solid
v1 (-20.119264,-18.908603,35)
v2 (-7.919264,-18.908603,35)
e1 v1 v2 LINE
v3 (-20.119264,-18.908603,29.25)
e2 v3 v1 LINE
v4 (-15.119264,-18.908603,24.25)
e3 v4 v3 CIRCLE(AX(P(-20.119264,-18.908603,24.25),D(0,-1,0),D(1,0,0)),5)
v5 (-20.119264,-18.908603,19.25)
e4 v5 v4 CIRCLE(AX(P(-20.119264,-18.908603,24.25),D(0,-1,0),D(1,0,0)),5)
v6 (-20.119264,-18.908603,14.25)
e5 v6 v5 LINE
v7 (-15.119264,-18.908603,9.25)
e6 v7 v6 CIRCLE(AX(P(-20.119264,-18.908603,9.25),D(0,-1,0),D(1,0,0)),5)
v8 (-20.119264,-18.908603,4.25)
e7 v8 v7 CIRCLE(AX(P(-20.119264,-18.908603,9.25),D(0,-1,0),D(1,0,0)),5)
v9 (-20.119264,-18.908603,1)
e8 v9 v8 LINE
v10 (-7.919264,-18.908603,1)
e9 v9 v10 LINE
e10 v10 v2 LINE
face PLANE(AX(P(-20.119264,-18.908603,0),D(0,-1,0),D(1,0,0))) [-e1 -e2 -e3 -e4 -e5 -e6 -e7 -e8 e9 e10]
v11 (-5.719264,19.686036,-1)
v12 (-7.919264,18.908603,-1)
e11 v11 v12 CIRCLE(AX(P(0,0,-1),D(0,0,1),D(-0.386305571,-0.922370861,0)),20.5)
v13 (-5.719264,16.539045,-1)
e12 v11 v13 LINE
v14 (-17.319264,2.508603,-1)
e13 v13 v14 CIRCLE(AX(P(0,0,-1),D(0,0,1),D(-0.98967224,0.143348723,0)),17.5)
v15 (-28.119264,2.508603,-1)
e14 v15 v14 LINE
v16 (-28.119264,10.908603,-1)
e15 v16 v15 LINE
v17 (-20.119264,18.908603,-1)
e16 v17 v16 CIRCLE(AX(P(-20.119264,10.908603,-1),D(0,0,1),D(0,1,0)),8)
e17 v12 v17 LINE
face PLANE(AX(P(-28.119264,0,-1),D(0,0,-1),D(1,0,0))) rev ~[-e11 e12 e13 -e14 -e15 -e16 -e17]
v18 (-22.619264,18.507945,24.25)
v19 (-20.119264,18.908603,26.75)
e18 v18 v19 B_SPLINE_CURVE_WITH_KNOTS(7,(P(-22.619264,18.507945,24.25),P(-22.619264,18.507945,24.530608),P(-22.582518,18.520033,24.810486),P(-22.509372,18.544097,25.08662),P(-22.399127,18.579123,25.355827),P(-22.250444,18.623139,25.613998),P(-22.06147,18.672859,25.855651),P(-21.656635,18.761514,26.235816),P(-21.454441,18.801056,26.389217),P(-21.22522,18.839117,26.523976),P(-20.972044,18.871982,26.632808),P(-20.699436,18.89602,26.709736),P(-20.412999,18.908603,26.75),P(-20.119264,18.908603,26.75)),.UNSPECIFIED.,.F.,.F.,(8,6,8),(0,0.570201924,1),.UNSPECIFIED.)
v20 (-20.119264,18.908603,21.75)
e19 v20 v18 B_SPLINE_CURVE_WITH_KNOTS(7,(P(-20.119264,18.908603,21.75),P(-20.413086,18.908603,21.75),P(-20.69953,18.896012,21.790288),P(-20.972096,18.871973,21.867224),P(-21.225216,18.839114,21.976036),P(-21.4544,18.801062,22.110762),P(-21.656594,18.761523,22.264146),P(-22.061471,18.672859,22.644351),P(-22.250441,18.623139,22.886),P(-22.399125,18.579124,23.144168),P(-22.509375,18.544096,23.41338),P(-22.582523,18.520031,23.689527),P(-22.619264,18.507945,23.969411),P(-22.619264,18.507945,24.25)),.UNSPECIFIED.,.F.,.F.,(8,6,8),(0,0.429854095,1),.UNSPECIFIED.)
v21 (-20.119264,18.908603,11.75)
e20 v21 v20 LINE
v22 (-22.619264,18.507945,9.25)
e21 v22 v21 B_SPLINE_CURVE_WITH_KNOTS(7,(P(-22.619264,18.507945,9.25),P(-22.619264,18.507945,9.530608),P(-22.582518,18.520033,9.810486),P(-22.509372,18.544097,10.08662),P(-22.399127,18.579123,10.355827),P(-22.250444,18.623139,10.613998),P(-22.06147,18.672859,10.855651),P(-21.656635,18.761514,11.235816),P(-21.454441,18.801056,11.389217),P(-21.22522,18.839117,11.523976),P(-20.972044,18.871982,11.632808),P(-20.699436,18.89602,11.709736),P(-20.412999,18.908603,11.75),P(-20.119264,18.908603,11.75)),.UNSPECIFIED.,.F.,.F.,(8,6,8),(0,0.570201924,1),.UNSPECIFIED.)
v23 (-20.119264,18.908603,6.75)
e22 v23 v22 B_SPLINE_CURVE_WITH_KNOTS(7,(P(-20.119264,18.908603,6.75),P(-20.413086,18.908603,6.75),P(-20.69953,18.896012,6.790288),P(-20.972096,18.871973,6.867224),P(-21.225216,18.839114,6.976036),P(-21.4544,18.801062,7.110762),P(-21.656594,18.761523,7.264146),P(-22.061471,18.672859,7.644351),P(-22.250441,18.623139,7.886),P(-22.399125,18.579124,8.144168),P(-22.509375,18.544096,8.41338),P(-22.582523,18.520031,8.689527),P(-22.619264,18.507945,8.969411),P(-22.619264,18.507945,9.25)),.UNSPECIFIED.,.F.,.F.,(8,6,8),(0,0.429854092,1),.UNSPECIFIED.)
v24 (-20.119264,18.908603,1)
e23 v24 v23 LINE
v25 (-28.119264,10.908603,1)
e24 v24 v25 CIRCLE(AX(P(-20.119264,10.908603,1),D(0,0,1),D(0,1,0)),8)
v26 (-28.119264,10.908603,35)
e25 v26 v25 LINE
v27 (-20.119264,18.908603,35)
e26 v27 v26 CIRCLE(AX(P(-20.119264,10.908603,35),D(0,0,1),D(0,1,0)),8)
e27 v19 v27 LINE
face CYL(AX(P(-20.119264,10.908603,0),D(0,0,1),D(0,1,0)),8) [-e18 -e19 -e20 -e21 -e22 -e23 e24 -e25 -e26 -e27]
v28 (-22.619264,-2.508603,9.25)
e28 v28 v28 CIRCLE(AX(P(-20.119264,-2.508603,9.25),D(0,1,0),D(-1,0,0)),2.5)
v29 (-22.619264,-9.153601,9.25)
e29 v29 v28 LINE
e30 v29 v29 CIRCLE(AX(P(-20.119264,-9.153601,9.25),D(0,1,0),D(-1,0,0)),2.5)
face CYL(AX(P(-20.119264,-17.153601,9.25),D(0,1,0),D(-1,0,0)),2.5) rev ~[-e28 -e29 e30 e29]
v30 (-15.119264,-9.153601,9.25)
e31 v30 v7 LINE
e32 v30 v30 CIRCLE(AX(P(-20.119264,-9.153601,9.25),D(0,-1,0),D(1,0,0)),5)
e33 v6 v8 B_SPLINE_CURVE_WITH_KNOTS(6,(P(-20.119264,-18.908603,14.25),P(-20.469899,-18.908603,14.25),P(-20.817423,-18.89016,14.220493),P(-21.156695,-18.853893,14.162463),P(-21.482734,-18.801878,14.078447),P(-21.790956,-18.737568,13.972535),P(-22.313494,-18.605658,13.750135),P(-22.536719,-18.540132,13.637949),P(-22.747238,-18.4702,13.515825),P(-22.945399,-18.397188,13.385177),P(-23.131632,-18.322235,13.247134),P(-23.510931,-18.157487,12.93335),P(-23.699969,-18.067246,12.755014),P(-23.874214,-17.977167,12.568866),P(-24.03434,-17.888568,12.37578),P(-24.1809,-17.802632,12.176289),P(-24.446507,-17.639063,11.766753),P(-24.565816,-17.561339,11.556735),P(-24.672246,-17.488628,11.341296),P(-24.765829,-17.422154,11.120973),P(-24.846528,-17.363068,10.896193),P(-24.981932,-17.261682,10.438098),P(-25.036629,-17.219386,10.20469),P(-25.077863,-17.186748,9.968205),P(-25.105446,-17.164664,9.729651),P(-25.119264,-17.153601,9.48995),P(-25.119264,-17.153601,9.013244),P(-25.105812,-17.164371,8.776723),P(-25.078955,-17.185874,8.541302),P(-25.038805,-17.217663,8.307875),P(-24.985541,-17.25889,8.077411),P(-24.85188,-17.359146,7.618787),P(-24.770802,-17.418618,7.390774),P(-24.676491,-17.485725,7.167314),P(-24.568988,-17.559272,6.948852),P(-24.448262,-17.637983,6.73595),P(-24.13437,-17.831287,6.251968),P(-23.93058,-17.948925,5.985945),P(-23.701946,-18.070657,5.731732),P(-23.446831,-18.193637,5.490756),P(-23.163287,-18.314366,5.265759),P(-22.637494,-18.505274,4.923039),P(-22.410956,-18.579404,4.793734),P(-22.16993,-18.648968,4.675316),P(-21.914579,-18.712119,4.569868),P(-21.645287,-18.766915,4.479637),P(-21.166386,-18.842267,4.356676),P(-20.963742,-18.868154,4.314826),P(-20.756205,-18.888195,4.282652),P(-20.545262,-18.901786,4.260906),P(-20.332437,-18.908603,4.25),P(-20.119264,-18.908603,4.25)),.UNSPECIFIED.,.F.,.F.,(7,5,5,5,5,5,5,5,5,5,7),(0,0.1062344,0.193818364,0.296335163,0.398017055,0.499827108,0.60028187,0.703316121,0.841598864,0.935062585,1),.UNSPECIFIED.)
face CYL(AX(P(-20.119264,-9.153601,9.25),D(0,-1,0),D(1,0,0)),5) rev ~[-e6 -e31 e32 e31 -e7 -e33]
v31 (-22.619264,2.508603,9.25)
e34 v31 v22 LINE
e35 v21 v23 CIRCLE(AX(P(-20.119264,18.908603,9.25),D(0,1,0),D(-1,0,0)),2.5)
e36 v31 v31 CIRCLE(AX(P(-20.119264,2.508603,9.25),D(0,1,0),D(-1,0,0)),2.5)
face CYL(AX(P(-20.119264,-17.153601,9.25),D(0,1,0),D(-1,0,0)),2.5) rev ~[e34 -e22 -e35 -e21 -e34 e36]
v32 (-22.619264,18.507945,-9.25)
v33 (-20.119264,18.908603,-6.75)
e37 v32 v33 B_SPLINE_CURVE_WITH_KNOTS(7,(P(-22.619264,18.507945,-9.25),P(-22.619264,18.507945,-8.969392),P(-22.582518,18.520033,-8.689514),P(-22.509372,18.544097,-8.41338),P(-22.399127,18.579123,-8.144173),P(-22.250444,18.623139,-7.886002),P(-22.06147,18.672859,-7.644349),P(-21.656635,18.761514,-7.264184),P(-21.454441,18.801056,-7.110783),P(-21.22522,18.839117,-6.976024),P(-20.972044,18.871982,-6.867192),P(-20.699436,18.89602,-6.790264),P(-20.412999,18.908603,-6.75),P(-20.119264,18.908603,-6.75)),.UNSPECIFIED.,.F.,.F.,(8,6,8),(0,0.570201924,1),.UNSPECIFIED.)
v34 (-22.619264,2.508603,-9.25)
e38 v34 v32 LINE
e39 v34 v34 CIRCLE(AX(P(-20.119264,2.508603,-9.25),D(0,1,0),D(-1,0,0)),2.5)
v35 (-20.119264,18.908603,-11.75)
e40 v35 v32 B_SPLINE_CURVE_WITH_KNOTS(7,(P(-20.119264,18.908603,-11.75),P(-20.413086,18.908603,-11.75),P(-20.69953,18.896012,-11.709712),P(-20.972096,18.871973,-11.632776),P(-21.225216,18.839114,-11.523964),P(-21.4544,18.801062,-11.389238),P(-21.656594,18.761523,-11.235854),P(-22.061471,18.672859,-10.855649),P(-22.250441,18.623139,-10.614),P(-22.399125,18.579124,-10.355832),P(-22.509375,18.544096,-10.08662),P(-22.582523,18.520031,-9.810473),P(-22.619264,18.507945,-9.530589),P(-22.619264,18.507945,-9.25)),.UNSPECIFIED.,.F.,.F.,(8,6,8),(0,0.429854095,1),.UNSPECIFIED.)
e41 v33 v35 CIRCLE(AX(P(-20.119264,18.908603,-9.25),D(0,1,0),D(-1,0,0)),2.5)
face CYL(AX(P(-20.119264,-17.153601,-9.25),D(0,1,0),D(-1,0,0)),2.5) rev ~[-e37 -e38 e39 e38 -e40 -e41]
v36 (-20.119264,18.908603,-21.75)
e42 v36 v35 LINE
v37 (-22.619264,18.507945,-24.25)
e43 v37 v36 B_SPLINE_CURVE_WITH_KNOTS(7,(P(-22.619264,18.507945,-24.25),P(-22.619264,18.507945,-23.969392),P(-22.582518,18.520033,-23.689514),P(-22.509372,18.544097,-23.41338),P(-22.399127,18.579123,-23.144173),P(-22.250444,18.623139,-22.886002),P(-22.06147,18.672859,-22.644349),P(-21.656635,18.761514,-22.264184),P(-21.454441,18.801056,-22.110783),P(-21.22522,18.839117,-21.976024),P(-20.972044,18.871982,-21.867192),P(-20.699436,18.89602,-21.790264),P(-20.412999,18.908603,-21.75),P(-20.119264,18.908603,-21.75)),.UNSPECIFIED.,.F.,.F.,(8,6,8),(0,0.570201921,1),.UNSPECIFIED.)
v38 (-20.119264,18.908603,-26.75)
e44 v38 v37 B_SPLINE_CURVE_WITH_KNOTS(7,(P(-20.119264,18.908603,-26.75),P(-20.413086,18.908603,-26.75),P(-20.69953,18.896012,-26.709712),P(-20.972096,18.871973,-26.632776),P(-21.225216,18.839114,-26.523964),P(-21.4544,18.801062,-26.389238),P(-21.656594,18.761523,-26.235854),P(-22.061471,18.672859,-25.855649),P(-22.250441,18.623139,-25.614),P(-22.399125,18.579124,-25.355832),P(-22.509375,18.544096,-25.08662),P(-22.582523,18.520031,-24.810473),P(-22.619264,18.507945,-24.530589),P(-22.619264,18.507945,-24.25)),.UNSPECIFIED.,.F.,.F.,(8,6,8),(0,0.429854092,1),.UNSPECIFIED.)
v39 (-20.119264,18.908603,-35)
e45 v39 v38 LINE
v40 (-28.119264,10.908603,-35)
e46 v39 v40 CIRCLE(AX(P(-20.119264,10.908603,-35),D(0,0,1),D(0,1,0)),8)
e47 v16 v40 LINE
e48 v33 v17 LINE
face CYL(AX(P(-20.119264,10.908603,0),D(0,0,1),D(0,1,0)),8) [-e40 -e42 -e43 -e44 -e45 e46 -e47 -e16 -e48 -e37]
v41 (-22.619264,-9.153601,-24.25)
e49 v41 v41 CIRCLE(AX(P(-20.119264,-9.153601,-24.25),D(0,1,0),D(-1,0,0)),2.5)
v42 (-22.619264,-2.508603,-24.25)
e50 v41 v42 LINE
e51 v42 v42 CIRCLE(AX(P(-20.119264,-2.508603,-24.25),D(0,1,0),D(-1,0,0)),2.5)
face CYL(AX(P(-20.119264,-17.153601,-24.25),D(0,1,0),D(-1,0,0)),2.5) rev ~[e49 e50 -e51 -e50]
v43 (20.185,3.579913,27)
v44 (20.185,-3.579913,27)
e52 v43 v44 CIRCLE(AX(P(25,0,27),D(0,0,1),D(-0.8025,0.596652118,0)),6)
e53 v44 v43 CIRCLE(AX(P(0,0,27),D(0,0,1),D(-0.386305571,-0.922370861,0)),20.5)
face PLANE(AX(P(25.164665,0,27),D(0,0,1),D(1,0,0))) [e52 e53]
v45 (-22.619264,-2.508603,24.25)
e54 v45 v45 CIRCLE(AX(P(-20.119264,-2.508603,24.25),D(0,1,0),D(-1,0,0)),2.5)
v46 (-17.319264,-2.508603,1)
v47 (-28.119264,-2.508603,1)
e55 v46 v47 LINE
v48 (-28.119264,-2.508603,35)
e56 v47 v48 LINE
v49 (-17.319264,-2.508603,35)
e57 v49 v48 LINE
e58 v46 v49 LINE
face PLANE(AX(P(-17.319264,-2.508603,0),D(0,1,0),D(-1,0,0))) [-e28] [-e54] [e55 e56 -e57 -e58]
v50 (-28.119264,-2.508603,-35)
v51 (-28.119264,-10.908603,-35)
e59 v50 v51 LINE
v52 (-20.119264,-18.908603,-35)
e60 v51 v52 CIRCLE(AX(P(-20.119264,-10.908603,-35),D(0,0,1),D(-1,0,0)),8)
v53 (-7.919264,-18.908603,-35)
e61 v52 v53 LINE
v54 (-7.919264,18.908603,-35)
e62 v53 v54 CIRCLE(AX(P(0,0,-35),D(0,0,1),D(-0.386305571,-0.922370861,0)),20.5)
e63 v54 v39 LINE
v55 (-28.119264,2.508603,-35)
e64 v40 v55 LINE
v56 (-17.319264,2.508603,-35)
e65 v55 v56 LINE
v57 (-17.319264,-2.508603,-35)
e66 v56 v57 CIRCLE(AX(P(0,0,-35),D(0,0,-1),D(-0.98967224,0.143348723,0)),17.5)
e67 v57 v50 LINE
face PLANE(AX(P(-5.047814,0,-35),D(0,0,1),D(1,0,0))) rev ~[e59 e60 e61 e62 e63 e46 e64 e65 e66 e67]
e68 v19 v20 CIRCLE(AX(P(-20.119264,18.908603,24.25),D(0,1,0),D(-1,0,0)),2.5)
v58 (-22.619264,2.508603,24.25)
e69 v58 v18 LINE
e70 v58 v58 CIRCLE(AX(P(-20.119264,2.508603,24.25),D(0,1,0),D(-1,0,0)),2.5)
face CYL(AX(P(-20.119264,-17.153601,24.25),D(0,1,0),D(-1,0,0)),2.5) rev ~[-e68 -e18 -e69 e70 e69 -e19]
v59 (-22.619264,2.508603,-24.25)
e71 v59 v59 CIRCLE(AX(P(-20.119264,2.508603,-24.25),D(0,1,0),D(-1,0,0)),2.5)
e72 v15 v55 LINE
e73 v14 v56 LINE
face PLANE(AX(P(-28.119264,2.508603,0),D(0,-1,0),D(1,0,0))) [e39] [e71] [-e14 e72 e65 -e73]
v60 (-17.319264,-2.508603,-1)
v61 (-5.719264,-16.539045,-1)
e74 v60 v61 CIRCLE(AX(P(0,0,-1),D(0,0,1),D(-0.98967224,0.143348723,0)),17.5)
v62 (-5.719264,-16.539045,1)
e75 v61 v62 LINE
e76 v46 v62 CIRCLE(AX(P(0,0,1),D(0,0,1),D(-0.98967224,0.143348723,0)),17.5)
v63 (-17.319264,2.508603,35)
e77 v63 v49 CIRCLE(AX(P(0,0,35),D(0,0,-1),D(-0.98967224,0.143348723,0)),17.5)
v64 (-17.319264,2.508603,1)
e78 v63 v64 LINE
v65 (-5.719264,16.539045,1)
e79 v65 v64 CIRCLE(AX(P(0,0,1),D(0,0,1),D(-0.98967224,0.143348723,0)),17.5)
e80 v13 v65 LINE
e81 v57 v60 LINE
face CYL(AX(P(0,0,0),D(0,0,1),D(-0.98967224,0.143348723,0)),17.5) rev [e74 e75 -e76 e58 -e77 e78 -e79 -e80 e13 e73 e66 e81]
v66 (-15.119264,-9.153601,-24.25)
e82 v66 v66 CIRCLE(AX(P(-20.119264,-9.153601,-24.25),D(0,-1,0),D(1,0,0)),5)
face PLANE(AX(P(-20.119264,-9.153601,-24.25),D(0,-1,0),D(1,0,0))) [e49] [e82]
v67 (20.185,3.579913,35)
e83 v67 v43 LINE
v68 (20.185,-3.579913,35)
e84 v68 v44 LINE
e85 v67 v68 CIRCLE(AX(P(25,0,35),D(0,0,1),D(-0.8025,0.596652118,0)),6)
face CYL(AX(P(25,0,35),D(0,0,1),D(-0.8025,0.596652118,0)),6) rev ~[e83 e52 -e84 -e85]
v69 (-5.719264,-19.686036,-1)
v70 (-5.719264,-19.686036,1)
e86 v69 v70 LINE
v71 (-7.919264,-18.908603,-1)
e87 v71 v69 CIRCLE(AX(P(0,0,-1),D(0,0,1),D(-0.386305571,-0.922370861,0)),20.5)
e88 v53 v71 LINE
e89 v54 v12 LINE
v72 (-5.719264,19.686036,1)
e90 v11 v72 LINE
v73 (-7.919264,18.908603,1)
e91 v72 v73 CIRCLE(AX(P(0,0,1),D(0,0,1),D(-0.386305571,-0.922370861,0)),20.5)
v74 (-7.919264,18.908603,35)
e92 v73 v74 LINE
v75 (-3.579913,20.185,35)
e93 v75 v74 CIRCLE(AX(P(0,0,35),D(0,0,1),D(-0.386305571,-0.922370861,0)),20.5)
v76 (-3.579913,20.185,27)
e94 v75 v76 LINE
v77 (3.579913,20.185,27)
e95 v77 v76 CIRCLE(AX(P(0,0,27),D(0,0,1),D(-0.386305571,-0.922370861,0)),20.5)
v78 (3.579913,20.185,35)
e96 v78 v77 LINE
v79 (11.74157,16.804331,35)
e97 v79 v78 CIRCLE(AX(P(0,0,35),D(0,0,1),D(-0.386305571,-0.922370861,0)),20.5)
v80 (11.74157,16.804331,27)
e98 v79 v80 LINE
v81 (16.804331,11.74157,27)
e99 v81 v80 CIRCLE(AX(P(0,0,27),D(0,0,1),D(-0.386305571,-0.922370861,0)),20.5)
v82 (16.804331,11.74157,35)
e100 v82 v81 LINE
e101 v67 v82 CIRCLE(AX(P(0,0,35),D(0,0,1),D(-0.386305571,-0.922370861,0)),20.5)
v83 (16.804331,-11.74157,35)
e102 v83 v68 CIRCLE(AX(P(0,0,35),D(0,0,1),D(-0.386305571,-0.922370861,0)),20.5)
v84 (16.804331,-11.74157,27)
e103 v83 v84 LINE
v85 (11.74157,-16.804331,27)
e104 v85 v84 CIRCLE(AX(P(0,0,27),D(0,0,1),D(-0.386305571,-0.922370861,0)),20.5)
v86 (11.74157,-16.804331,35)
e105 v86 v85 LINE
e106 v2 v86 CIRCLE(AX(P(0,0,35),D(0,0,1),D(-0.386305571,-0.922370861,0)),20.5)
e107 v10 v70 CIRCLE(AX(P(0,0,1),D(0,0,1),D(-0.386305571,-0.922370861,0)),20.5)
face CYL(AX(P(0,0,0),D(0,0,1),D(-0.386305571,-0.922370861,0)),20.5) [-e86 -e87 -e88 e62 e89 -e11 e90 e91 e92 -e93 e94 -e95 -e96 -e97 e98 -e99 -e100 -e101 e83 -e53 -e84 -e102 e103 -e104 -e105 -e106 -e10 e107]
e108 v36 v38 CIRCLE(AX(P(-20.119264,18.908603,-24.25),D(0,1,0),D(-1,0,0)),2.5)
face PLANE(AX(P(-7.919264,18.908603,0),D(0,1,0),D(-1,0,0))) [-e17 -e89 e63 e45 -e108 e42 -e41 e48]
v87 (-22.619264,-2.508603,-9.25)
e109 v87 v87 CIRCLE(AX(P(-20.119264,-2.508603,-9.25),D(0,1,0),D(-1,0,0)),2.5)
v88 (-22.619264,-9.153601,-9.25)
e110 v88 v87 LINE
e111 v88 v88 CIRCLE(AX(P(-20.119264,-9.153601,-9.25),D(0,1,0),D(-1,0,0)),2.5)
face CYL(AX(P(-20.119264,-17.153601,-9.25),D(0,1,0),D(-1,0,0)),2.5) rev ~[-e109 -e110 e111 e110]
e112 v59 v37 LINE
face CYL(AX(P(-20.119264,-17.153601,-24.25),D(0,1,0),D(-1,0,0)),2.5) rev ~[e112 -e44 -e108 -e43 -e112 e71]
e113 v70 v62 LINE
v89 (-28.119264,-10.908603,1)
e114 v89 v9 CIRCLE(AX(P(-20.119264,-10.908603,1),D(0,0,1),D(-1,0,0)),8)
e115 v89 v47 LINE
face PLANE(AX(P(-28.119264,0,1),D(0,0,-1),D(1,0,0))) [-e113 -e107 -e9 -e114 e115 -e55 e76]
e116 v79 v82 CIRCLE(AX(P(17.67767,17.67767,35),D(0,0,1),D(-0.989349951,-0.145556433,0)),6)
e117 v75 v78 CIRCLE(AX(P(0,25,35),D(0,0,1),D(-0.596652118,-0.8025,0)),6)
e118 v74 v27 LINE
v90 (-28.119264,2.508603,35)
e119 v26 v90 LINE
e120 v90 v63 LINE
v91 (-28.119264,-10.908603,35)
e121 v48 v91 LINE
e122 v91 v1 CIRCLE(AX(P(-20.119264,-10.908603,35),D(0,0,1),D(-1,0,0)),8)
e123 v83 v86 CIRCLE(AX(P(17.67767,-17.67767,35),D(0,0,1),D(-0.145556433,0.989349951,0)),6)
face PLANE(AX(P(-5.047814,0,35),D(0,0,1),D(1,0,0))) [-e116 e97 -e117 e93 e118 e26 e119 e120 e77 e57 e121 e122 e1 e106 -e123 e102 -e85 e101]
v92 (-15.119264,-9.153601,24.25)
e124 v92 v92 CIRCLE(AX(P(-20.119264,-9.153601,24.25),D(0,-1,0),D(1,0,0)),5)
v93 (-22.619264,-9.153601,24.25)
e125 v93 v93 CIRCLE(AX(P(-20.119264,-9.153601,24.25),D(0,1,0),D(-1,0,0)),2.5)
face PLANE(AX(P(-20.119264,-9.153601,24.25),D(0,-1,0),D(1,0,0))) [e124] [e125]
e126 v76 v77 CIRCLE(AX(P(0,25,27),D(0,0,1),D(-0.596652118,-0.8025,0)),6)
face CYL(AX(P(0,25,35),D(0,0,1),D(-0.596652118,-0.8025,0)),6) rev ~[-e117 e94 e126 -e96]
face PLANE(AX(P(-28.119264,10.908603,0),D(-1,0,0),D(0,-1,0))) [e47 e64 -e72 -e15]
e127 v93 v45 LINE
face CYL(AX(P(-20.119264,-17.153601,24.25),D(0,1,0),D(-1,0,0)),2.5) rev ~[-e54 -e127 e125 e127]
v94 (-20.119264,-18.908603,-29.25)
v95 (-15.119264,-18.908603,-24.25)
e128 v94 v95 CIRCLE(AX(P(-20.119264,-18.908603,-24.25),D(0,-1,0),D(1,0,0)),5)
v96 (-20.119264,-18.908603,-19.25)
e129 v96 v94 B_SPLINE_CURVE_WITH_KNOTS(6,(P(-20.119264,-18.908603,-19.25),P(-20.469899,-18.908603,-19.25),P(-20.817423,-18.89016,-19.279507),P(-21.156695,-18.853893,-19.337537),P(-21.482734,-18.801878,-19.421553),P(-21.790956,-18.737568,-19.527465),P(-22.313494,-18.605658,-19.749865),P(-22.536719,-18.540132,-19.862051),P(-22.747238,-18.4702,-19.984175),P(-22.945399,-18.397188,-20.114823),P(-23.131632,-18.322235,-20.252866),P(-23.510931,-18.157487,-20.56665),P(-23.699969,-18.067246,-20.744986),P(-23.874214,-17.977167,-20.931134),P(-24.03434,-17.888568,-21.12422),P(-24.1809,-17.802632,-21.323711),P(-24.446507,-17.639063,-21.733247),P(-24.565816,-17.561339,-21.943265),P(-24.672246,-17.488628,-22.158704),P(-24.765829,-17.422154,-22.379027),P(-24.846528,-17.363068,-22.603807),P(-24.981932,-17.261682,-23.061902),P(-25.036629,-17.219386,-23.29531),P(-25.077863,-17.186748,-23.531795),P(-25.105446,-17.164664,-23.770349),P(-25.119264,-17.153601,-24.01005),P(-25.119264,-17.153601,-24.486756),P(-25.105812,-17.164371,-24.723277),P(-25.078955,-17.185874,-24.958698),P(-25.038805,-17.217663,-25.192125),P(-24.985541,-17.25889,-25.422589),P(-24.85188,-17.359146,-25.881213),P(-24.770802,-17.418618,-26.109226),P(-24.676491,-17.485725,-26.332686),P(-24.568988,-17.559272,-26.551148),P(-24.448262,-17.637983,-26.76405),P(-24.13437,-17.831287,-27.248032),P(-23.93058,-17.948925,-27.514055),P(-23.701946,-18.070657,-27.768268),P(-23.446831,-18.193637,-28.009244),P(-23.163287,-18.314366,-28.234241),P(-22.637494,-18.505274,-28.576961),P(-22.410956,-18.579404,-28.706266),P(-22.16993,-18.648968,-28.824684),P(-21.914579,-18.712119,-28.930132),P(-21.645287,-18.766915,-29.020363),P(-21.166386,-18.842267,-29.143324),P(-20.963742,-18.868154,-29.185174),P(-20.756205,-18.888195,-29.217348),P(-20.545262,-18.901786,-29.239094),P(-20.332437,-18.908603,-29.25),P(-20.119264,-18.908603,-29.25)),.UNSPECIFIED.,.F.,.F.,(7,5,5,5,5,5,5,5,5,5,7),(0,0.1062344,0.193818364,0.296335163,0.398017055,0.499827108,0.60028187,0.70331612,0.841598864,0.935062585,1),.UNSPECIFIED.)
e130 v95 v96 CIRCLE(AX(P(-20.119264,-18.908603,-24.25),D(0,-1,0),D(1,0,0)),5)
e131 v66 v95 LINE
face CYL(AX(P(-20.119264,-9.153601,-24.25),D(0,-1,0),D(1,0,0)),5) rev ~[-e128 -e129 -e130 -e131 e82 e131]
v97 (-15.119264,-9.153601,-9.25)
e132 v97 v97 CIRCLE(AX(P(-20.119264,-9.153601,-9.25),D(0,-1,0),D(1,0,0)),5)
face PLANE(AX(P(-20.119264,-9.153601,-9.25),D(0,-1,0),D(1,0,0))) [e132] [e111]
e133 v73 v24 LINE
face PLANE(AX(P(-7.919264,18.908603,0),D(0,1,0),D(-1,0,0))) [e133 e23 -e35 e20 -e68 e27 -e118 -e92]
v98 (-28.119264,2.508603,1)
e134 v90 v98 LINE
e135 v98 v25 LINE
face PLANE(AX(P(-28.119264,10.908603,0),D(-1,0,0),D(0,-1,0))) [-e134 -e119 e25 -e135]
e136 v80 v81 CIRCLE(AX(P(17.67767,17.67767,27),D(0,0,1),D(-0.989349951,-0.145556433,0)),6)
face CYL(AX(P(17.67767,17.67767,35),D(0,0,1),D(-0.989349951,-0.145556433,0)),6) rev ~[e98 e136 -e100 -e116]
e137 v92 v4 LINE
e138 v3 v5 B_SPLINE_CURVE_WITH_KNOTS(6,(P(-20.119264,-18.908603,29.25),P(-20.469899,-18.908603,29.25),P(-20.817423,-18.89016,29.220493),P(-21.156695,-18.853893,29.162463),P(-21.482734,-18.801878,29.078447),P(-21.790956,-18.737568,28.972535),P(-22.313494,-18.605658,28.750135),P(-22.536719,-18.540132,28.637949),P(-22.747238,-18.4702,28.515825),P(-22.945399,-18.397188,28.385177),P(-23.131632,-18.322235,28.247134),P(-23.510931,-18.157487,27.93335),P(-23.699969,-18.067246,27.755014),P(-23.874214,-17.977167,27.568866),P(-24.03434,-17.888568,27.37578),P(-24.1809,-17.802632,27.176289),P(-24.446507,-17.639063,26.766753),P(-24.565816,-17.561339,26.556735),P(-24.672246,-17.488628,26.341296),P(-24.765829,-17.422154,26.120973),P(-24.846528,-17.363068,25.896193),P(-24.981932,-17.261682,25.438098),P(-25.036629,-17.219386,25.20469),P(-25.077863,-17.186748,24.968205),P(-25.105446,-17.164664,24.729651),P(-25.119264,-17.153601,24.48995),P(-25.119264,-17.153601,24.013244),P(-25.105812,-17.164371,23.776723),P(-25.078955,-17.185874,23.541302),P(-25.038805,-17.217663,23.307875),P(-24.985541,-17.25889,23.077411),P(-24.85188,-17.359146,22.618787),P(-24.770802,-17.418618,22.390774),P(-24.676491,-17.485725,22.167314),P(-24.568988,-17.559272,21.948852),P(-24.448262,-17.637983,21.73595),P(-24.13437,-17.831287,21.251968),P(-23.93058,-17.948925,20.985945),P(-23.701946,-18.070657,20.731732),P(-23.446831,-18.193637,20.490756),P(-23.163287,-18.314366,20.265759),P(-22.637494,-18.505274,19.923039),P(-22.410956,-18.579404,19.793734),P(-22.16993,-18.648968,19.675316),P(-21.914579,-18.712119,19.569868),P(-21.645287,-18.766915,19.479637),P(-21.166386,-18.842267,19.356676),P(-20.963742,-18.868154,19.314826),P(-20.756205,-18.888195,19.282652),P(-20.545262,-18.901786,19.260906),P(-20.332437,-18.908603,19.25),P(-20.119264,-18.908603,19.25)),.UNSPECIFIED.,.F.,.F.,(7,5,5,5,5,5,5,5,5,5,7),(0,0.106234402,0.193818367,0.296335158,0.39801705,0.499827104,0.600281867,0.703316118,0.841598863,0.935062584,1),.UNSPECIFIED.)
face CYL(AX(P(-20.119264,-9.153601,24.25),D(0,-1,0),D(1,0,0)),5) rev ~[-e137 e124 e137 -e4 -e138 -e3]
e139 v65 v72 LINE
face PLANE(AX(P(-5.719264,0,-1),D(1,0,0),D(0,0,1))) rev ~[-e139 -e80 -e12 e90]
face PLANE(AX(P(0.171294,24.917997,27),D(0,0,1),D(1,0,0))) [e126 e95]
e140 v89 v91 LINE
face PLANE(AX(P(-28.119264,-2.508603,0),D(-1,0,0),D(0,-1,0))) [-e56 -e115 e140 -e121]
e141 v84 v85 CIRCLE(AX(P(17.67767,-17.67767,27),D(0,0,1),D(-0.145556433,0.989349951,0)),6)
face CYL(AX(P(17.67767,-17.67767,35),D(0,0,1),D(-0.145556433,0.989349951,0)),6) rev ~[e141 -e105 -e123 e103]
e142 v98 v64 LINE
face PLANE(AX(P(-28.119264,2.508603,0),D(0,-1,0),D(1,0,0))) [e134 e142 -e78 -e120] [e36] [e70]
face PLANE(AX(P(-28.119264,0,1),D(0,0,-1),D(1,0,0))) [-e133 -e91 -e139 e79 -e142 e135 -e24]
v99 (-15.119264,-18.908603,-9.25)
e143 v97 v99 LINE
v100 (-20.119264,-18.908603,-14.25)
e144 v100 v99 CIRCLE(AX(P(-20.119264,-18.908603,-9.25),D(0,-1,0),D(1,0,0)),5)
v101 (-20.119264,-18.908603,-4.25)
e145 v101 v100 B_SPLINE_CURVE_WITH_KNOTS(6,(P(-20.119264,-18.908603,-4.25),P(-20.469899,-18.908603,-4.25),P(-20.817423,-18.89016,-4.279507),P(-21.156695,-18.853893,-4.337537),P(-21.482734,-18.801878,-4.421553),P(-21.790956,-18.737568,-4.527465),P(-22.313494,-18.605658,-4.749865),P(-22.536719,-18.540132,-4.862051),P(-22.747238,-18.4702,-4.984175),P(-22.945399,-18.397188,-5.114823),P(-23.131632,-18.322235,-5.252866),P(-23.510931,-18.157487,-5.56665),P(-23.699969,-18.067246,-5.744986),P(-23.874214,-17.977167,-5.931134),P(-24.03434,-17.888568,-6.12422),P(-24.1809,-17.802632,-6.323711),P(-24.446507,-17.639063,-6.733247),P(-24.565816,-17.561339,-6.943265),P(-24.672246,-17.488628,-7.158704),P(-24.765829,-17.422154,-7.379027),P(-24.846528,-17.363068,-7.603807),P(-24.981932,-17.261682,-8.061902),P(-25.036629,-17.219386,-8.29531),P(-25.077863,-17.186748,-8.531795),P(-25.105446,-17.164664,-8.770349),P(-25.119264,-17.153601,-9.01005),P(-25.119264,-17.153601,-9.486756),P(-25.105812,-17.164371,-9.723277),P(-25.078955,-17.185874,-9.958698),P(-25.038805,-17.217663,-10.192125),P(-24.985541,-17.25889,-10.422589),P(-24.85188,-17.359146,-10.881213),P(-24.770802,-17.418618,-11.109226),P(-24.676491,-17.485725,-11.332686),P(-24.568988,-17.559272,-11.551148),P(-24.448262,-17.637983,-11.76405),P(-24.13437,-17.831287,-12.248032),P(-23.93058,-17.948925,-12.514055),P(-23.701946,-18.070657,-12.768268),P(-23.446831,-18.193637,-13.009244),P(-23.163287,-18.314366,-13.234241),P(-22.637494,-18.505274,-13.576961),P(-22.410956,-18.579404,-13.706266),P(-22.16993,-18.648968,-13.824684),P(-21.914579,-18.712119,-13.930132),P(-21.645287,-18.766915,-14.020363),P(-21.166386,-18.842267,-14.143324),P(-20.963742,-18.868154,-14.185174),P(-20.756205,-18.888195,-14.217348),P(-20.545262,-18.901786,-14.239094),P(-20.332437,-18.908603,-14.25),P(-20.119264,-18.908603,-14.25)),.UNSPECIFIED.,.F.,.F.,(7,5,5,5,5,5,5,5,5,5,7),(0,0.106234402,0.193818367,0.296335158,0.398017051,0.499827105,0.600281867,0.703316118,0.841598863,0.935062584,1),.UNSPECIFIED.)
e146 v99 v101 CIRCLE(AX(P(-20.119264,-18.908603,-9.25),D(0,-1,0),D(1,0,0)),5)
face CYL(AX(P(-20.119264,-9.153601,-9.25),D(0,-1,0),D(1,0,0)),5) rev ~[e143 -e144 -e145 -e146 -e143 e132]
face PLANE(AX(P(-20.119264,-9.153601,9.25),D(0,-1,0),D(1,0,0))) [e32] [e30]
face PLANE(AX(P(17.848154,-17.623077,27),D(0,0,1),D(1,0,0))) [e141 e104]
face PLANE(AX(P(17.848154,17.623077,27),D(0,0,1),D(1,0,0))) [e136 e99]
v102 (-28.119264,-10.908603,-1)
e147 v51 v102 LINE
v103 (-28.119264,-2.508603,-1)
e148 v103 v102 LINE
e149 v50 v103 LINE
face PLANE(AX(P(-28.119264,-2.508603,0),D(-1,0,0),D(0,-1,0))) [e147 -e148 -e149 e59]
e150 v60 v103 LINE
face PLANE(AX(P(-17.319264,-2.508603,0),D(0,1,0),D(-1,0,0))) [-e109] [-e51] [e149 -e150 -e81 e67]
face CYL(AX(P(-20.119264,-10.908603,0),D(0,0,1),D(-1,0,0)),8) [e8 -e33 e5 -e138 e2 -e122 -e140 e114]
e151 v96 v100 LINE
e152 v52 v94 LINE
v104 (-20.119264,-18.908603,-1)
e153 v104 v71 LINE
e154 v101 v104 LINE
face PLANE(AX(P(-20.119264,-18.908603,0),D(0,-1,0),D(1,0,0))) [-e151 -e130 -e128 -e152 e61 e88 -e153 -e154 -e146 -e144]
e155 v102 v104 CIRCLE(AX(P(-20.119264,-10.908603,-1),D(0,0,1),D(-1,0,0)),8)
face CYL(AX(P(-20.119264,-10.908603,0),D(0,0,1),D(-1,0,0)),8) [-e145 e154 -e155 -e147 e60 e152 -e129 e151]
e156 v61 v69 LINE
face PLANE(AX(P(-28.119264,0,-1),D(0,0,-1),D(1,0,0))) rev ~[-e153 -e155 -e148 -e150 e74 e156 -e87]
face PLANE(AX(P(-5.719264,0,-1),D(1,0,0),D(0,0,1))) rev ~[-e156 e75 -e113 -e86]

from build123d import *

# Parameters (mm, degrees)
F1_DEPTH       = 35
F3_D           = 5
F3_START       = 1.7550021
F3_CBORE_D     = 10
F3_CBORE_DEPTH = 8
F4_W           = 22.4
F4_H           = 2
F5_DEPTH       = 25
F7_DEPTH       = 8


with BuildPart() as f1:
    # F0 (on Top) → F1 (new body, symmetric)
    with BuildSketch(Plane.XY):
        with BuildLine():
            ThreePointArc((-17.3192642082, 2.5086026559), (17.5, 0), (-17.3192642082, -2.5086026559))
            Line((-17.3192642082, -2.5086026559), (-28.1192642082, -2.5086026559))
            Line((-28.1192642082, -2.5086026559), (-28.1192642082, -10.9086026559))
            ThreePointArc((-28.1192642082, -10.9086026559), (-25.7761184577, -16.5654569054), (-20.1192642082, -18.9086026559))
            Line((-20.1192642082, -18.9086026559), (-7.9192642082, -18.9086026559))
            ThreePointArc((-7.9192642082, -18.9086026559), (20.5, 0), (-7.9192642082, 18.9086026559))
            Line((-7.9192642082, 18.9086026559), (-20.1192642082, 18.9086026559))
            ThreePointArc((-20.1192642082, 18.9086026559), (-25.7761184577, 16.5654569054), (-28.1192642082, 10.9086026559))
            Line((-28.1192642082, 10.9086026559), (-28.1192642082, 2.5086026559))
            Line((-28.1192642082, 2.5086026559), (-17.3192642082, 2.5086026559))
        make_face()
    extrude(amount=F1_DEPTH, both=True)

    # F3 (through all)
    # its depths count from where the whole tool has entered the part; down to there all is cleared
    with Locations(Plane.XZ.offset(18.9086026559).offset(-F3_START)):
        with Locations((-20.1192642082, 24.25), (-20.1192642082, 9.25), (-20.1192642082, -9.25), (-20.1192642082, -24.25)):
            CounterBoreHole(F3_D / 2, F3_CBORE_D / 2, F3_CBORE_DEPTH)

    # F4 (on Front) → F5 (cut, symmetric)
    with BuildSketch(Plane.XZ):
        with Locations((-16.9192642082, 0)):
            Rectangle(F4_W, F4_H)
    extrude(amount=F5_DEPTH, both=True, mode=Mode.SUBTRACT)

    # F6 (on face) → F7 (cut)
    with BuildSketch(Plane.XY.offset(35)):
        with BuildLine():
            ThreePointArc((16.8043309304, -11.7415698261), (14.4956890143, -14.4956890143), (11.7415698261, -16.8043309304))
            ThreePointArc((11.7415698261, -16.8043309304), (17.2398329286, -23.6616731318), (23.6776695297, -17.6776695297))
            ThreePointArc((23.6776695297, -17.6776695297), (21.5994018258, -13.1367427743), (16.8043309304, -11.7415698261))
        make_face()
        with BuildLine():
            ThreePointArc((16.8043309304, -11.7415698261), (13.4350288425, -13.4350288425), (11.7415698261, -16.8043309304))
            ThreePointArc((11.7415698261, -16.8043309304), (14.4956890143, -14.4956890143), (16.8043309304, -11.7415698261))
        make_face()
        with BuildLine():
            ThreePointArc((20.185, 3.5799127084), (20.5, 0), (20.185, -3.5799127084))
            ThreePointArc((20.185, -3.5799127084), (26.8854707635, -5.6960512638), (31, 0))
            ThreePointArc((31, 0), (26.8854707635, 5.6960512638), (20.185, 3.5799127084))
        make_face()
        with BuildLine():
            ThreePointArc((20.185, 3.5799127084), (19, 0), (20.185, -3.5799127084))
            ThreePointArc((20.185, -3.5799127084), (20.5, 0), (20.185, 3.5799127084))
        make_face()
        with BuildLine():
            ThreePointArc((11.7415698261, 16.8043309304), (14.4956890143, 14.4956890143), (16.8043309304, 11.7415698261))
            ThreePointArc((16.8043309304, 11.7415698261), (21.5994018258, 13.1367427743), (23.6776695297, 17.6776695297))
            ThreePointArc((23.6776695297, 17.6776695297), (17.2398329286, 23.6616731318), (11.7415698261, 16.8043309304))
        make_face()
        with BuildLine():
            ThreePointArc((11.7415698261, 16.8043309304), (13.4350288425, 13.4350288425), (16.8043309304, 11.7415698261))
            ThreePointArc((16.8043309304, 11.7415698261), (14.4956890143, 14.4956890143), (11.7415698261, 16.8043309304))
        make_face()
        with BuildLine():
            ThreePointArc((-3.5799127084, 20.185), (0, 20.5), (3.5799127084, 20.185))
            ThreePointArc((3.5799127084, 20.185), (5.3609456372, 22.305512688), (6, 25))
            ThreePointArc((6, 25), (-2.694487312, 30.3609456372), (-3.5799127084, 20.185))
        make_face()
        with BuildLine():
            ThreePointArc((-3.5799127084, 20.185), (0, 19), (3.5799127084, 20.185))
            ThreePointArc((3.5799127084, 20.185), (0, 20.5), (-3.5799127084, 20.185))
        make_face()
    extrude(amount=-F7_DEPTH, mode=Mode.SUBTRACT)


solid = f1.part
